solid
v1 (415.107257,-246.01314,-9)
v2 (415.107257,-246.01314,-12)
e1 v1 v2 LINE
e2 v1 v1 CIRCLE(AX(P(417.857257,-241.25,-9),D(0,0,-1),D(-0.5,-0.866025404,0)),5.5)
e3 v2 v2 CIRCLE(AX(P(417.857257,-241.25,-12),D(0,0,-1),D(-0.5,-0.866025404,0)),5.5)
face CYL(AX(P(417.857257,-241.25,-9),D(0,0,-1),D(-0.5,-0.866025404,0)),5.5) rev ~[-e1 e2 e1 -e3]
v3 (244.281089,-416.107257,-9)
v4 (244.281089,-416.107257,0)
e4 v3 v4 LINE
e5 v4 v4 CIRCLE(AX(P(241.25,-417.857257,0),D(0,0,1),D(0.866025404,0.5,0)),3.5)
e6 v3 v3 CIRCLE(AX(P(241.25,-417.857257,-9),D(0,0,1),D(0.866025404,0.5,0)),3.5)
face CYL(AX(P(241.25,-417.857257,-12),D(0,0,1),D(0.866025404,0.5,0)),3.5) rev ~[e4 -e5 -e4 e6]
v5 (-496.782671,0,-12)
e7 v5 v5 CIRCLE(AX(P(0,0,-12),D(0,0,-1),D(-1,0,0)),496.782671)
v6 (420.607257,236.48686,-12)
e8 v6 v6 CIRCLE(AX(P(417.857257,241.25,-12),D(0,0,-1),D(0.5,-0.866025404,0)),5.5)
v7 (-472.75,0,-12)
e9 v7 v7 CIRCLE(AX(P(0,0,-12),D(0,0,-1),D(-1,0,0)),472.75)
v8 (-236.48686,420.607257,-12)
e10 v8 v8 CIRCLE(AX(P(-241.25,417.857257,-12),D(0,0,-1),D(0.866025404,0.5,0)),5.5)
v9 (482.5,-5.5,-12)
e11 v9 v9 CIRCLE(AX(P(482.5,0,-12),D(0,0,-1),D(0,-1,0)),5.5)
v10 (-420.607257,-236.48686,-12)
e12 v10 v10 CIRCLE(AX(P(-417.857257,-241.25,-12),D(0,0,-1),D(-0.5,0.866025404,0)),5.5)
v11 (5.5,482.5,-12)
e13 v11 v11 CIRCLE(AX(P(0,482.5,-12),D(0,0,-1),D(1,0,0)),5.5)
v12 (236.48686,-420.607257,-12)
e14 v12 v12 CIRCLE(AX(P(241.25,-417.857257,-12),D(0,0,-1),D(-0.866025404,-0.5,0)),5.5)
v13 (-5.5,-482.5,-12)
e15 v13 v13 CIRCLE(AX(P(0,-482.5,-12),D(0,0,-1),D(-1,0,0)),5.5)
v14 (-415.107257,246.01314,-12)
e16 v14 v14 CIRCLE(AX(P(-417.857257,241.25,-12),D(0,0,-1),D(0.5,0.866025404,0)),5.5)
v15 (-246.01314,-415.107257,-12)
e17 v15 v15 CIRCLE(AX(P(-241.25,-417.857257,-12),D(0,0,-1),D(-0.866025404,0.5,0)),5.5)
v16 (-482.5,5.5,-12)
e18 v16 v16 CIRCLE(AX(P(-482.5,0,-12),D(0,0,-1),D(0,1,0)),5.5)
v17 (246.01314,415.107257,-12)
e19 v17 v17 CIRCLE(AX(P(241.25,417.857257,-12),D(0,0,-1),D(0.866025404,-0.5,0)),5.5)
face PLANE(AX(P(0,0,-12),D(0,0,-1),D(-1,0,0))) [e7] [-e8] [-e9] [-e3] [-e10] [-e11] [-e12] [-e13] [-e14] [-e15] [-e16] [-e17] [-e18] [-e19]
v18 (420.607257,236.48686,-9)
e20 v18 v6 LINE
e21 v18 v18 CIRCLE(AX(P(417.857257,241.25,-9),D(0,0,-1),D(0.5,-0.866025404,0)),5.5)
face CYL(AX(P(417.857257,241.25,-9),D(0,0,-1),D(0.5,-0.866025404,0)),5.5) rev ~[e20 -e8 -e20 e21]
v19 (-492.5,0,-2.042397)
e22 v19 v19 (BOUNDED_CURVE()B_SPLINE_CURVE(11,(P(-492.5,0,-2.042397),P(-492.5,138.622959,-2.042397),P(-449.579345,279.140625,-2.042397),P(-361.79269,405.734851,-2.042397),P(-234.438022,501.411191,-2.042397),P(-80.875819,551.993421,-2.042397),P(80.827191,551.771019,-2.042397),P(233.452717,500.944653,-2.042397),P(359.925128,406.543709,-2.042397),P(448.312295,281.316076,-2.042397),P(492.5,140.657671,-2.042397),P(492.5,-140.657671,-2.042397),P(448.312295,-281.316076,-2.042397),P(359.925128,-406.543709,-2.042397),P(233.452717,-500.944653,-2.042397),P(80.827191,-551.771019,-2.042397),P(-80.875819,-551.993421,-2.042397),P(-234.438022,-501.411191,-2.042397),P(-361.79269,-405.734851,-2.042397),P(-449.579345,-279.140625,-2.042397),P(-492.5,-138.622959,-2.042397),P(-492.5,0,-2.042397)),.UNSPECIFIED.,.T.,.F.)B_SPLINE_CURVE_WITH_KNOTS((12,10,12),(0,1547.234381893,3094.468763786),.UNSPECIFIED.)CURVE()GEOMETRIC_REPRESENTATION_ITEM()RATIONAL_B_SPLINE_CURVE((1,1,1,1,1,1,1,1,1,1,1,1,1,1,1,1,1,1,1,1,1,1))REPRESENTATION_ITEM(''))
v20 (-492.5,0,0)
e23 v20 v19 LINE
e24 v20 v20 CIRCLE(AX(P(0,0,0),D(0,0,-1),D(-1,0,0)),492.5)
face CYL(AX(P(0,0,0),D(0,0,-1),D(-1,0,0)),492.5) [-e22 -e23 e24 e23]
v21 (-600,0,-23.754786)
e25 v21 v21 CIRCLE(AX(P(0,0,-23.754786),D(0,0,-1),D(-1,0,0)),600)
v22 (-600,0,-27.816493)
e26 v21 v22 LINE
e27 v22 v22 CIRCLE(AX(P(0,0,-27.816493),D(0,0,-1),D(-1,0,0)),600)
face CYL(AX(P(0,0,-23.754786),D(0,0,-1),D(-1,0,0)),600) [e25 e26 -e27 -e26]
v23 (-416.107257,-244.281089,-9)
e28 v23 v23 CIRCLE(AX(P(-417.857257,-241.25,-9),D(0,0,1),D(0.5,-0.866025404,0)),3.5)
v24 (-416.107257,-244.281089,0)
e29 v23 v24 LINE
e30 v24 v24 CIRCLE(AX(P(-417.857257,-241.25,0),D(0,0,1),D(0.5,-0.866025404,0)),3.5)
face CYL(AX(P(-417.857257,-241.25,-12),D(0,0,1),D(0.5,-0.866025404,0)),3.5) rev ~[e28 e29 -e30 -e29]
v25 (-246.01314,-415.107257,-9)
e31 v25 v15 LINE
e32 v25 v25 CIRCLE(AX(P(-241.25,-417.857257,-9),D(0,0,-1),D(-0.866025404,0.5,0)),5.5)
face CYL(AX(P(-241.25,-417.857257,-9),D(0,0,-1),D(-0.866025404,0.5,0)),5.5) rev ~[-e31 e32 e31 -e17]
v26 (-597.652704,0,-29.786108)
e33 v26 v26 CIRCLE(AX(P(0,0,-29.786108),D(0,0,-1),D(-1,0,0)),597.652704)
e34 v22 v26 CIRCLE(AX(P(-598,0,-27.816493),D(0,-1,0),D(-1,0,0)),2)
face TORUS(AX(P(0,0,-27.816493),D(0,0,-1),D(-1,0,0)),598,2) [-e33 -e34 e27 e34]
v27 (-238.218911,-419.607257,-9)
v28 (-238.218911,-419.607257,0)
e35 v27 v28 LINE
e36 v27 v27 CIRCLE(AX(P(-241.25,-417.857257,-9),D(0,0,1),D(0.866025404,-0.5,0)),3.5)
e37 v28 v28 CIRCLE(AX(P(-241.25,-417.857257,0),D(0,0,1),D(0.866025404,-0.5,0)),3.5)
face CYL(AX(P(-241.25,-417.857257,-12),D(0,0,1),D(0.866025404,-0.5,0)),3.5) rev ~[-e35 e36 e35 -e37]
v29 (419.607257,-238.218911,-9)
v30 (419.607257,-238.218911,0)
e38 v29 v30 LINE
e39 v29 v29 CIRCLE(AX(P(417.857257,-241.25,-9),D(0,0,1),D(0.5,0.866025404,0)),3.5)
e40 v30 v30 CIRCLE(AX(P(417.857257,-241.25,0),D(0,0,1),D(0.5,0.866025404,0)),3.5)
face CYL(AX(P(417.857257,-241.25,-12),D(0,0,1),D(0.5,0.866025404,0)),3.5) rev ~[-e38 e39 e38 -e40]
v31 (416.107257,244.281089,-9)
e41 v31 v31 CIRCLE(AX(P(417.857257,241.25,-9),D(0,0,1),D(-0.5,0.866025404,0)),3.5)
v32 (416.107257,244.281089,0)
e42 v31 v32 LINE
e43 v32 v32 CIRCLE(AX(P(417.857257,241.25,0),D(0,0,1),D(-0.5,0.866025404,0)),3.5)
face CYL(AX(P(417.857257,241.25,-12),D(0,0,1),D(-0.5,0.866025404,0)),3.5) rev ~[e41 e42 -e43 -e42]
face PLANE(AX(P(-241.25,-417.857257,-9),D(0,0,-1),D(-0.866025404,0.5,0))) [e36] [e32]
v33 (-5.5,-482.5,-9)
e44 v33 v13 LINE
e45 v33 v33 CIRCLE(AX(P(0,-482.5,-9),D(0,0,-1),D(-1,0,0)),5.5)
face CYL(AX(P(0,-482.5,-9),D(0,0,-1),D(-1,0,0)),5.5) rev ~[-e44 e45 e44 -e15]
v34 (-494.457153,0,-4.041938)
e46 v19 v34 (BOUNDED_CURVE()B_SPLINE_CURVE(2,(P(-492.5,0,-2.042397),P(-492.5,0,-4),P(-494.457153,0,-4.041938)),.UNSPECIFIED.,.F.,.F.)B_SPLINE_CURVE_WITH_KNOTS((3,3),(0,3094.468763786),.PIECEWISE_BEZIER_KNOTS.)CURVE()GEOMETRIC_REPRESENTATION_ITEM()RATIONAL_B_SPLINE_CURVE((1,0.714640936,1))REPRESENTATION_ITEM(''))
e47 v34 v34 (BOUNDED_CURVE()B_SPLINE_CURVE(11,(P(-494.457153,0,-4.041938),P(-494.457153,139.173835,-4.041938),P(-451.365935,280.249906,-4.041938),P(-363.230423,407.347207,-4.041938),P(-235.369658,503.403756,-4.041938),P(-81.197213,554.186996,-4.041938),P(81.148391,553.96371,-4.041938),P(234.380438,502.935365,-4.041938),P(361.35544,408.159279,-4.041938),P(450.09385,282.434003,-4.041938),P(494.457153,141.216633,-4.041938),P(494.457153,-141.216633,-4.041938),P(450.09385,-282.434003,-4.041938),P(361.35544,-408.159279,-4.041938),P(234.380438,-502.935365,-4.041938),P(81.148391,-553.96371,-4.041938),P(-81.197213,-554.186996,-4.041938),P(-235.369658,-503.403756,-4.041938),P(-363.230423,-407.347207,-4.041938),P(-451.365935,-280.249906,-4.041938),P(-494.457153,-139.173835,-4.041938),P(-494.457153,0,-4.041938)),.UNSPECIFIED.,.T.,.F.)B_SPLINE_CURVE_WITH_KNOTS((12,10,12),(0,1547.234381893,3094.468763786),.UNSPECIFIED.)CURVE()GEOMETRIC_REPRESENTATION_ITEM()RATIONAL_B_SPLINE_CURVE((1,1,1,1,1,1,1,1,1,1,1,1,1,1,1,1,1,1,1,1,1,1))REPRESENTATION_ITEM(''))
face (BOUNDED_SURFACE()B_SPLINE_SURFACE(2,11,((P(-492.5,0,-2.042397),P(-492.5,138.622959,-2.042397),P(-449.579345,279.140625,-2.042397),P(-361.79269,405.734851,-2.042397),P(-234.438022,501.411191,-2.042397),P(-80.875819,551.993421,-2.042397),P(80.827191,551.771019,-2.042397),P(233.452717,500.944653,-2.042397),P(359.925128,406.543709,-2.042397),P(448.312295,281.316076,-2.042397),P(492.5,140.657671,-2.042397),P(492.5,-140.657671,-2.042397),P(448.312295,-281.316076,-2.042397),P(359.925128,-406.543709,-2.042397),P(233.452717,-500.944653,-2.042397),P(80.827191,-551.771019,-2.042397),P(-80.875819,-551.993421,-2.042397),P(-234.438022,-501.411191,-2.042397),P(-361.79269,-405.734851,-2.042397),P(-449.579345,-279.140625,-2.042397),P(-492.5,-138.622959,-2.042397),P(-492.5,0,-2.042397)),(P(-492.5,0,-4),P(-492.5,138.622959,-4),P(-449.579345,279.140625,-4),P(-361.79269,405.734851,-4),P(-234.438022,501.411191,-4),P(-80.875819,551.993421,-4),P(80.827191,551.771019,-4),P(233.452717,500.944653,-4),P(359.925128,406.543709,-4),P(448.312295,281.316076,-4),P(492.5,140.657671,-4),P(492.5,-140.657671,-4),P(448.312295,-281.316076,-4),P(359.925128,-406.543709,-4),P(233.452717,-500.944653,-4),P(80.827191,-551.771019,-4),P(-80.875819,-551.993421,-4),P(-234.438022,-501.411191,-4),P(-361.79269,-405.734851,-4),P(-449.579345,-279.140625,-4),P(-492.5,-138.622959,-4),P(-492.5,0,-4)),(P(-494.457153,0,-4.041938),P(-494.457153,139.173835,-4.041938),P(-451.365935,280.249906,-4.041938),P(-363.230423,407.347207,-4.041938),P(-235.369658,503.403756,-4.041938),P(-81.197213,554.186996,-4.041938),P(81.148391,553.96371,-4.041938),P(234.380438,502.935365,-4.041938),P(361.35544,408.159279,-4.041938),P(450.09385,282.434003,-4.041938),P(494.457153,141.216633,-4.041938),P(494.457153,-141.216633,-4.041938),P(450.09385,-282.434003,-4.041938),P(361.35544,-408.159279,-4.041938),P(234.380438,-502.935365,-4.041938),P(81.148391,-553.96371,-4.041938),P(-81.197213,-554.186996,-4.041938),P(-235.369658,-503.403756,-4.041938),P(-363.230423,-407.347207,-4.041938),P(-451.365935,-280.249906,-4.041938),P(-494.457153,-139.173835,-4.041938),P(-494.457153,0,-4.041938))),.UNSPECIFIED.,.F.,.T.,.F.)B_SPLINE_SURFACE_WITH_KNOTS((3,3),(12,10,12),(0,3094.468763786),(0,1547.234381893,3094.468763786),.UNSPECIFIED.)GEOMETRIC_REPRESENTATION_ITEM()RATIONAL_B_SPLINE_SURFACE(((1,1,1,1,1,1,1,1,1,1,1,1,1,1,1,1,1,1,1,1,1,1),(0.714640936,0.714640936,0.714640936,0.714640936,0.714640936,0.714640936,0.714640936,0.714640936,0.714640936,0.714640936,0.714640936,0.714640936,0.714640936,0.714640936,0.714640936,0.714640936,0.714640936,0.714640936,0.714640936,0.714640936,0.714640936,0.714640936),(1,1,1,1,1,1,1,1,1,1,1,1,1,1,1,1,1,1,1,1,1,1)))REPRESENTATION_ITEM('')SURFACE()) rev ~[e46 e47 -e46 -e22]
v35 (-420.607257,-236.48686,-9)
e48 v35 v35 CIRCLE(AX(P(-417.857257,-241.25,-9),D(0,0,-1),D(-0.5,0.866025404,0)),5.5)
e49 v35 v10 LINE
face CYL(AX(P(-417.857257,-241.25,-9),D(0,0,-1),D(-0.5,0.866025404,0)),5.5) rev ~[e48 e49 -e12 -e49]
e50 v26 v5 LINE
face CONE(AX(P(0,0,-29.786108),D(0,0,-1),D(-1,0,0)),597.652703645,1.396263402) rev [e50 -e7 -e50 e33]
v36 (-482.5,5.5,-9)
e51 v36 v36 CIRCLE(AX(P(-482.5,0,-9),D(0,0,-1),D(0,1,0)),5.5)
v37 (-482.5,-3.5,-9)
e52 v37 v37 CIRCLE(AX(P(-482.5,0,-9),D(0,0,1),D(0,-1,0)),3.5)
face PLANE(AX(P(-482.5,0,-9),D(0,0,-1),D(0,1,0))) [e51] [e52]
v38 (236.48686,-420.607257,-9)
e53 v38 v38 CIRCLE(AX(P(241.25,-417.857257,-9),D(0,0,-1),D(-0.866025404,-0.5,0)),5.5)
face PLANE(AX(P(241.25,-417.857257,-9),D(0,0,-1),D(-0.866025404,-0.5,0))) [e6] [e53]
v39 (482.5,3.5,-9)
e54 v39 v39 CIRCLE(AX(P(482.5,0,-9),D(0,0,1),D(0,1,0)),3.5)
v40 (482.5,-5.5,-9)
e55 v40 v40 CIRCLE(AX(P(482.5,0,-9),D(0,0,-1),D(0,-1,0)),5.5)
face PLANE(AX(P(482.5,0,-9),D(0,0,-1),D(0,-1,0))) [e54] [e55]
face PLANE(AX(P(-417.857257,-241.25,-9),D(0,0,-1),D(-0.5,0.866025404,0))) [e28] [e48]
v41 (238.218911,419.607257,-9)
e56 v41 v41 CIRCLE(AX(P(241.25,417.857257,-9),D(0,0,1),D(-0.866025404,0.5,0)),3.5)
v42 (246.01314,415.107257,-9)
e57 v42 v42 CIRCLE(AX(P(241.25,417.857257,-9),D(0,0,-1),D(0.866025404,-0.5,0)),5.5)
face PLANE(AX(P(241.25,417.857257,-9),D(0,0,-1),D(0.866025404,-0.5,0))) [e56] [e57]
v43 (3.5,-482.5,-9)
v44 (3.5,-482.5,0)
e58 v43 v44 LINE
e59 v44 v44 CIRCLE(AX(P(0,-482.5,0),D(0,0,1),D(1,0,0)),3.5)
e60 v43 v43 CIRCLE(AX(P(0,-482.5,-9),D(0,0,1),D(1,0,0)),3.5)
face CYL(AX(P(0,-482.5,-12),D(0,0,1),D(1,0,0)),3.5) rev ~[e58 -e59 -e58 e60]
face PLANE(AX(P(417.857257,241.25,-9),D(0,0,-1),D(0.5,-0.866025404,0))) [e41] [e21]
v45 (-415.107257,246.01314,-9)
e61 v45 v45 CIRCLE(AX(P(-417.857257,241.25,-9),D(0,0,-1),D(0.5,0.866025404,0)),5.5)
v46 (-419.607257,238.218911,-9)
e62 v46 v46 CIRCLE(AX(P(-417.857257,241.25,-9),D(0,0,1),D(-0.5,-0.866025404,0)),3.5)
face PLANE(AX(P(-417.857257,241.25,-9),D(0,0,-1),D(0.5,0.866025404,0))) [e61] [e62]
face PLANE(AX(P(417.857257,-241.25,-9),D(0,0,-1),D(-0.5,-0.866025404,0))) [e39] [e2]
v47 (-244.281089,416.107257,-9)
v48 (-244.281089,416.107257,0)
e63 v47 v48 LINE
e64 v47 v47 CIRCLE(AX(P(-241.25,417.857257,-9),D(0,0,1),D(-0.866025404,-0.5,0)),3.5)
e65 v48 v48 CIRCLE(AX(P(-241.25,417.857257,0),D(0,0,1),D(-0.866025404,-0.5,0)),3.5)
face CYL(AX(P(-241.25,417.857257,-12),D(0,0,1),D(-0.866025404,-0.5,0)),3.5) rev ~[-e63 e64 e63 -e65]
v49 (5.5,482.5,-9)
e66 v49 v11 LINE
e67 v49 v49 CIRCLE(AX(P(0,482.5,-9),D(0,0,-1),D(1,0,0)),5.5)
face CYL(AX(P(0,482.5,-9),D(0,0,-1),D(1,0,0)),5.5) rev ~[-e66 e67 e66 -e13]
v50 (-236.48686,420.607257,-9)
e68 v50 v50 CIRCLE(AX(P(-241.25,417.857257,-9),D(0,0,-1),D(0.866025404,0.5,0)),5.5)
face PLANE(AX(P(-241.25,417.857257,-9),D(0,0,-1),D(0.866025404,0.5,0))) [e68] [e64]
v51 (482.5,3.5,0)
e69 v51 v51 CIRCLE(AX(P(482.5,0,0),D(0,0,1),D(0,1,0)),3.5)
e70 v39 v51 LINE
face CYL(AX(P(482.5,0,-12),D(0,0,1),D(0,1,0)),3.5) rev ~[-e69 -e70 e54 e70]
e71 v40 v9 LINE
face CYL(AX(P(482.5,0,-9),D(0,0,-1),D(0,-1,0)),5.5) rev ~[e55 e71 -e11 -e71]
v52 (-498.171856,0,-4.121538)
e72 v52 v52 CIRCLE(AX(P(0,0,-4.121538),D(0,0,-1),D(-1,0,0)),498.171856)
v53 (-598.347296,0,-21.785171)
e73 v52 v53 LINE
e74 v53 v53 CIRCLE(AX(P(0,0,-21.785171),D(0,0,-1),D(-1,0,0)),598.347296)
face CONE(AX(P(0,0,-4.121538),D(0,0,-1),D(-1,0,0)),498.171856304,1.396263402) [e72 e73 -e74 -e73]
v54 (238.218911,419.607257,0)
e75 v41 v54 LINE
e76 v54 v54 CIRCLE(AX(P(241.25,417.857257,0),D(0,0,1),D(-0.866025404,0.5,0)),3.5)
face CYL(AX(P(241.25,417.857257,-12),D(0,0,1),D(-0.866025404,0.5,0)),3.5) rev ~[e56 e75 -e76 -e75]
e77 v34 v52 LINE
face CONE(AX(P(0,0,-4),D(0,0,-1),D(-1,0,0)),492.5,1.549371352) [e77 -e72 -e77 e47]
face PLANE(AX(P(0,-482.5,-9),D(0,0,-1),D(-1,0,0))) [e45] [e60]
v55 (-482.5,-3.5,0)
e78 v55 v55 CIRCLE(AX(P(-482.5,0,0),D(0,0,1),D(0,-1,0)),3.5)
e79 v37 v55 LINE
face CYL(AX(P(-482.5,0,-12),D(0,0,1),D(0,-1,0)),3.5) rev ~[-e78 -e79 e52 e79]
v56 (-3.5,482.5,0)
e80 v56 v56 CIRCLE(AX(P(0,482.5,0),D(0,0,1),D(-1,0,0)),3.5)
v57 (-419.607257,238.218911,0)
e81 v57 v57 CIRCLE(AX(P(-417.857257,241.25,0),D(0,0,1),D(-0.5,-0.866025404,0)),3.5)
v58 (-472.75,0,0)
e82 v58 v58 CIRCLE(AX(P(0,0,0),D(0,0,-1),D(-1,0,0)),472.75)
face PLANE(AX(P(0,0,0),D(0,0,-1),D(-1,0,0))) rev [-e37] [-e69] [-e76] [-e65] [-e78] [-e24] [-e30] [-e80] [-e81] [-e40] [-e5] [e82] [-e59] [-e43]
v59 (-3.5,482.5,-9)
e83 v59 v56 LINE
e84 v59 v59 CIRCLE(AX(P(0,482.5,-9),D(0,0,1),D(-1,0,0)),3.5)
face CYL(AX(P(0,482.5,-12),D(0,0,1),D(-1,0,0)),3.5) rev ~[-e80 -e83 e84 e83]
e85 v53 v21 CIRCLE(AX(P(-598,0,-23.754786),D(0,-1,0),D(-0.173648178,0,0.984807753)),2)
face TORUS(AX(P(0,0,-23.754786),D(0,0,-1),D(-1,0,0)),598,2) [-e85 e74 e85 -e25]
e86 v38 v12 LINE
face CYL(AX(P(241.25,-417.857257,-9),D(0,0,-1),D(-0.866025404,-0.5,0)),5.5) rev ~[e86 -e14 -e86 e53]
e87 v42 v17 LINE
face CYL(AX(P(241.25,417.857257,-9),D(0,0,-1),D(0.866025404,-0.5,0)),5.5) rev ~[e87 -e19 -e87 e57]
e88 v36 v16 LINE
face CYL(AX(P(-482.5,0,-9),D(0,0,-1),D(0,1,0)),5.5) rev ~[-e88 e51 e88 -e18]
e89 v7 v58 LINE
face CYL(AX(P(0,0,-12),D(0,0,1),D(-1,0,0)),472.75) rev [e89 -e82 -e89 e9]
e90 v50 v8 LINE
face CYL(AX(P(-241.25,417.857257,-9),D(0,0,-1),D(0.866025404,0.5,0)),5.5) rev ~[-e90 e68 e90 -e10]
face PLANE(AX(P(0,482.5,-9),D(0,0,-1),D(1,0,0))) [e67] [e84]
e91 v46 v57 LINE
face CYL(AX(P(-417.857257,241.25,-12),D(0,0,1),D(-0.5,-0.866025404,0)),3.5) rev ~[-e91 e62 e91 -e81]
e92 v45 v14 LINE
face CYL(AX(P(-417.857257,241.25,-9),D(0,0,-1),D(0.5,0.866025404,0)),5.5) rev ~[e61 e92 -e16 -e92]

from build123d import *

# Parameters (mm, degrees)
F3_D            = 7
F3_DEPTH        = 50
F3_CBORE_D      = 11
F3_CBORE_DEPTH  = 3
F3_TIP          = 2.1030121666
F3_COPIES_COUNT = 12
F4_R            = 2


# Not quite as in the source:
# - a pattern or mirror of a feature is missing from the dataset's text; its kind, count and spacing are read off the source's solid


with BuildPart() as f1:
    # F0 (on Front) → F1 (revolve)
    with BuildSketch(Plane.XZ):
        with BuildLine():
            Line((-472.75, -12), (-472.75, 0))
            Line((-472.75, 0), (-492.5, 0))
            Line((-492.5, 0), (-492.5, -4))
            Line((-492.5, -4), (-498.1718563043, -4.1215379759))
            Line((-498.1718563043, -4.1215379759), (-598.3472963553, -21.7851708612))
            ThreePointArc((-598.3472963553, -21.7851708612), (-599.5320888862, -22.4692111479), (-600, -23.7547863673))
            Line((-600, -23.7547863673), (-600, -27.8164928148))
            ThreePointArc((-600, -27.8164928148), (-599.2855752194, -29.348581701), (-597.6527036447, -29.7861083208))
            Line((-597.6527036447, -29.7861083208), (-496.782670883, -12))
            Line((-496.782670883, -12), (-472.75, -12))
        make_face()
    revolve(axis=Axis((0, 0, -202.4746355881), (0, 0, -1)))

    # F3
    with Locations(Plane(origin=(0, 0, -12), x_dir=(1, 0, 0), z_dir=(0, 0, -1))):
        with Locations((0, -482.5)):
            f3 = CounterBoreHole(F3_D / 2, F3_CBORE_D / 2, F3_CBORE_DEPTH, depth=F3_DEPTH)
            with Locations((0, 0, -(F3_DEPTH + F3_TIP / 2))):  # 118° drill point
                Cone(0, F3_D / 2, F3_TIP, mode=Mode.SUBTRACT)

    # F3_copies: F3 ×12 about axis
    f3_copies_axis = Axis((0, 0, 0), (0, 0, 1))
    for i in range(1, F3_COPIES_COUNT):
        add(f3.rotate(f3_copies_axis, i * 360 / F3_COPIES_COUNT), mode=Mode.SUBTRACT)

    # F4
    f4_edges = [f1.edges().sort_by_distance(p)[0] for p in [
        (492.5, 0, -4),
    ]]
    fillet(f4_edges, radius=F4_R)


solid = f1.part
